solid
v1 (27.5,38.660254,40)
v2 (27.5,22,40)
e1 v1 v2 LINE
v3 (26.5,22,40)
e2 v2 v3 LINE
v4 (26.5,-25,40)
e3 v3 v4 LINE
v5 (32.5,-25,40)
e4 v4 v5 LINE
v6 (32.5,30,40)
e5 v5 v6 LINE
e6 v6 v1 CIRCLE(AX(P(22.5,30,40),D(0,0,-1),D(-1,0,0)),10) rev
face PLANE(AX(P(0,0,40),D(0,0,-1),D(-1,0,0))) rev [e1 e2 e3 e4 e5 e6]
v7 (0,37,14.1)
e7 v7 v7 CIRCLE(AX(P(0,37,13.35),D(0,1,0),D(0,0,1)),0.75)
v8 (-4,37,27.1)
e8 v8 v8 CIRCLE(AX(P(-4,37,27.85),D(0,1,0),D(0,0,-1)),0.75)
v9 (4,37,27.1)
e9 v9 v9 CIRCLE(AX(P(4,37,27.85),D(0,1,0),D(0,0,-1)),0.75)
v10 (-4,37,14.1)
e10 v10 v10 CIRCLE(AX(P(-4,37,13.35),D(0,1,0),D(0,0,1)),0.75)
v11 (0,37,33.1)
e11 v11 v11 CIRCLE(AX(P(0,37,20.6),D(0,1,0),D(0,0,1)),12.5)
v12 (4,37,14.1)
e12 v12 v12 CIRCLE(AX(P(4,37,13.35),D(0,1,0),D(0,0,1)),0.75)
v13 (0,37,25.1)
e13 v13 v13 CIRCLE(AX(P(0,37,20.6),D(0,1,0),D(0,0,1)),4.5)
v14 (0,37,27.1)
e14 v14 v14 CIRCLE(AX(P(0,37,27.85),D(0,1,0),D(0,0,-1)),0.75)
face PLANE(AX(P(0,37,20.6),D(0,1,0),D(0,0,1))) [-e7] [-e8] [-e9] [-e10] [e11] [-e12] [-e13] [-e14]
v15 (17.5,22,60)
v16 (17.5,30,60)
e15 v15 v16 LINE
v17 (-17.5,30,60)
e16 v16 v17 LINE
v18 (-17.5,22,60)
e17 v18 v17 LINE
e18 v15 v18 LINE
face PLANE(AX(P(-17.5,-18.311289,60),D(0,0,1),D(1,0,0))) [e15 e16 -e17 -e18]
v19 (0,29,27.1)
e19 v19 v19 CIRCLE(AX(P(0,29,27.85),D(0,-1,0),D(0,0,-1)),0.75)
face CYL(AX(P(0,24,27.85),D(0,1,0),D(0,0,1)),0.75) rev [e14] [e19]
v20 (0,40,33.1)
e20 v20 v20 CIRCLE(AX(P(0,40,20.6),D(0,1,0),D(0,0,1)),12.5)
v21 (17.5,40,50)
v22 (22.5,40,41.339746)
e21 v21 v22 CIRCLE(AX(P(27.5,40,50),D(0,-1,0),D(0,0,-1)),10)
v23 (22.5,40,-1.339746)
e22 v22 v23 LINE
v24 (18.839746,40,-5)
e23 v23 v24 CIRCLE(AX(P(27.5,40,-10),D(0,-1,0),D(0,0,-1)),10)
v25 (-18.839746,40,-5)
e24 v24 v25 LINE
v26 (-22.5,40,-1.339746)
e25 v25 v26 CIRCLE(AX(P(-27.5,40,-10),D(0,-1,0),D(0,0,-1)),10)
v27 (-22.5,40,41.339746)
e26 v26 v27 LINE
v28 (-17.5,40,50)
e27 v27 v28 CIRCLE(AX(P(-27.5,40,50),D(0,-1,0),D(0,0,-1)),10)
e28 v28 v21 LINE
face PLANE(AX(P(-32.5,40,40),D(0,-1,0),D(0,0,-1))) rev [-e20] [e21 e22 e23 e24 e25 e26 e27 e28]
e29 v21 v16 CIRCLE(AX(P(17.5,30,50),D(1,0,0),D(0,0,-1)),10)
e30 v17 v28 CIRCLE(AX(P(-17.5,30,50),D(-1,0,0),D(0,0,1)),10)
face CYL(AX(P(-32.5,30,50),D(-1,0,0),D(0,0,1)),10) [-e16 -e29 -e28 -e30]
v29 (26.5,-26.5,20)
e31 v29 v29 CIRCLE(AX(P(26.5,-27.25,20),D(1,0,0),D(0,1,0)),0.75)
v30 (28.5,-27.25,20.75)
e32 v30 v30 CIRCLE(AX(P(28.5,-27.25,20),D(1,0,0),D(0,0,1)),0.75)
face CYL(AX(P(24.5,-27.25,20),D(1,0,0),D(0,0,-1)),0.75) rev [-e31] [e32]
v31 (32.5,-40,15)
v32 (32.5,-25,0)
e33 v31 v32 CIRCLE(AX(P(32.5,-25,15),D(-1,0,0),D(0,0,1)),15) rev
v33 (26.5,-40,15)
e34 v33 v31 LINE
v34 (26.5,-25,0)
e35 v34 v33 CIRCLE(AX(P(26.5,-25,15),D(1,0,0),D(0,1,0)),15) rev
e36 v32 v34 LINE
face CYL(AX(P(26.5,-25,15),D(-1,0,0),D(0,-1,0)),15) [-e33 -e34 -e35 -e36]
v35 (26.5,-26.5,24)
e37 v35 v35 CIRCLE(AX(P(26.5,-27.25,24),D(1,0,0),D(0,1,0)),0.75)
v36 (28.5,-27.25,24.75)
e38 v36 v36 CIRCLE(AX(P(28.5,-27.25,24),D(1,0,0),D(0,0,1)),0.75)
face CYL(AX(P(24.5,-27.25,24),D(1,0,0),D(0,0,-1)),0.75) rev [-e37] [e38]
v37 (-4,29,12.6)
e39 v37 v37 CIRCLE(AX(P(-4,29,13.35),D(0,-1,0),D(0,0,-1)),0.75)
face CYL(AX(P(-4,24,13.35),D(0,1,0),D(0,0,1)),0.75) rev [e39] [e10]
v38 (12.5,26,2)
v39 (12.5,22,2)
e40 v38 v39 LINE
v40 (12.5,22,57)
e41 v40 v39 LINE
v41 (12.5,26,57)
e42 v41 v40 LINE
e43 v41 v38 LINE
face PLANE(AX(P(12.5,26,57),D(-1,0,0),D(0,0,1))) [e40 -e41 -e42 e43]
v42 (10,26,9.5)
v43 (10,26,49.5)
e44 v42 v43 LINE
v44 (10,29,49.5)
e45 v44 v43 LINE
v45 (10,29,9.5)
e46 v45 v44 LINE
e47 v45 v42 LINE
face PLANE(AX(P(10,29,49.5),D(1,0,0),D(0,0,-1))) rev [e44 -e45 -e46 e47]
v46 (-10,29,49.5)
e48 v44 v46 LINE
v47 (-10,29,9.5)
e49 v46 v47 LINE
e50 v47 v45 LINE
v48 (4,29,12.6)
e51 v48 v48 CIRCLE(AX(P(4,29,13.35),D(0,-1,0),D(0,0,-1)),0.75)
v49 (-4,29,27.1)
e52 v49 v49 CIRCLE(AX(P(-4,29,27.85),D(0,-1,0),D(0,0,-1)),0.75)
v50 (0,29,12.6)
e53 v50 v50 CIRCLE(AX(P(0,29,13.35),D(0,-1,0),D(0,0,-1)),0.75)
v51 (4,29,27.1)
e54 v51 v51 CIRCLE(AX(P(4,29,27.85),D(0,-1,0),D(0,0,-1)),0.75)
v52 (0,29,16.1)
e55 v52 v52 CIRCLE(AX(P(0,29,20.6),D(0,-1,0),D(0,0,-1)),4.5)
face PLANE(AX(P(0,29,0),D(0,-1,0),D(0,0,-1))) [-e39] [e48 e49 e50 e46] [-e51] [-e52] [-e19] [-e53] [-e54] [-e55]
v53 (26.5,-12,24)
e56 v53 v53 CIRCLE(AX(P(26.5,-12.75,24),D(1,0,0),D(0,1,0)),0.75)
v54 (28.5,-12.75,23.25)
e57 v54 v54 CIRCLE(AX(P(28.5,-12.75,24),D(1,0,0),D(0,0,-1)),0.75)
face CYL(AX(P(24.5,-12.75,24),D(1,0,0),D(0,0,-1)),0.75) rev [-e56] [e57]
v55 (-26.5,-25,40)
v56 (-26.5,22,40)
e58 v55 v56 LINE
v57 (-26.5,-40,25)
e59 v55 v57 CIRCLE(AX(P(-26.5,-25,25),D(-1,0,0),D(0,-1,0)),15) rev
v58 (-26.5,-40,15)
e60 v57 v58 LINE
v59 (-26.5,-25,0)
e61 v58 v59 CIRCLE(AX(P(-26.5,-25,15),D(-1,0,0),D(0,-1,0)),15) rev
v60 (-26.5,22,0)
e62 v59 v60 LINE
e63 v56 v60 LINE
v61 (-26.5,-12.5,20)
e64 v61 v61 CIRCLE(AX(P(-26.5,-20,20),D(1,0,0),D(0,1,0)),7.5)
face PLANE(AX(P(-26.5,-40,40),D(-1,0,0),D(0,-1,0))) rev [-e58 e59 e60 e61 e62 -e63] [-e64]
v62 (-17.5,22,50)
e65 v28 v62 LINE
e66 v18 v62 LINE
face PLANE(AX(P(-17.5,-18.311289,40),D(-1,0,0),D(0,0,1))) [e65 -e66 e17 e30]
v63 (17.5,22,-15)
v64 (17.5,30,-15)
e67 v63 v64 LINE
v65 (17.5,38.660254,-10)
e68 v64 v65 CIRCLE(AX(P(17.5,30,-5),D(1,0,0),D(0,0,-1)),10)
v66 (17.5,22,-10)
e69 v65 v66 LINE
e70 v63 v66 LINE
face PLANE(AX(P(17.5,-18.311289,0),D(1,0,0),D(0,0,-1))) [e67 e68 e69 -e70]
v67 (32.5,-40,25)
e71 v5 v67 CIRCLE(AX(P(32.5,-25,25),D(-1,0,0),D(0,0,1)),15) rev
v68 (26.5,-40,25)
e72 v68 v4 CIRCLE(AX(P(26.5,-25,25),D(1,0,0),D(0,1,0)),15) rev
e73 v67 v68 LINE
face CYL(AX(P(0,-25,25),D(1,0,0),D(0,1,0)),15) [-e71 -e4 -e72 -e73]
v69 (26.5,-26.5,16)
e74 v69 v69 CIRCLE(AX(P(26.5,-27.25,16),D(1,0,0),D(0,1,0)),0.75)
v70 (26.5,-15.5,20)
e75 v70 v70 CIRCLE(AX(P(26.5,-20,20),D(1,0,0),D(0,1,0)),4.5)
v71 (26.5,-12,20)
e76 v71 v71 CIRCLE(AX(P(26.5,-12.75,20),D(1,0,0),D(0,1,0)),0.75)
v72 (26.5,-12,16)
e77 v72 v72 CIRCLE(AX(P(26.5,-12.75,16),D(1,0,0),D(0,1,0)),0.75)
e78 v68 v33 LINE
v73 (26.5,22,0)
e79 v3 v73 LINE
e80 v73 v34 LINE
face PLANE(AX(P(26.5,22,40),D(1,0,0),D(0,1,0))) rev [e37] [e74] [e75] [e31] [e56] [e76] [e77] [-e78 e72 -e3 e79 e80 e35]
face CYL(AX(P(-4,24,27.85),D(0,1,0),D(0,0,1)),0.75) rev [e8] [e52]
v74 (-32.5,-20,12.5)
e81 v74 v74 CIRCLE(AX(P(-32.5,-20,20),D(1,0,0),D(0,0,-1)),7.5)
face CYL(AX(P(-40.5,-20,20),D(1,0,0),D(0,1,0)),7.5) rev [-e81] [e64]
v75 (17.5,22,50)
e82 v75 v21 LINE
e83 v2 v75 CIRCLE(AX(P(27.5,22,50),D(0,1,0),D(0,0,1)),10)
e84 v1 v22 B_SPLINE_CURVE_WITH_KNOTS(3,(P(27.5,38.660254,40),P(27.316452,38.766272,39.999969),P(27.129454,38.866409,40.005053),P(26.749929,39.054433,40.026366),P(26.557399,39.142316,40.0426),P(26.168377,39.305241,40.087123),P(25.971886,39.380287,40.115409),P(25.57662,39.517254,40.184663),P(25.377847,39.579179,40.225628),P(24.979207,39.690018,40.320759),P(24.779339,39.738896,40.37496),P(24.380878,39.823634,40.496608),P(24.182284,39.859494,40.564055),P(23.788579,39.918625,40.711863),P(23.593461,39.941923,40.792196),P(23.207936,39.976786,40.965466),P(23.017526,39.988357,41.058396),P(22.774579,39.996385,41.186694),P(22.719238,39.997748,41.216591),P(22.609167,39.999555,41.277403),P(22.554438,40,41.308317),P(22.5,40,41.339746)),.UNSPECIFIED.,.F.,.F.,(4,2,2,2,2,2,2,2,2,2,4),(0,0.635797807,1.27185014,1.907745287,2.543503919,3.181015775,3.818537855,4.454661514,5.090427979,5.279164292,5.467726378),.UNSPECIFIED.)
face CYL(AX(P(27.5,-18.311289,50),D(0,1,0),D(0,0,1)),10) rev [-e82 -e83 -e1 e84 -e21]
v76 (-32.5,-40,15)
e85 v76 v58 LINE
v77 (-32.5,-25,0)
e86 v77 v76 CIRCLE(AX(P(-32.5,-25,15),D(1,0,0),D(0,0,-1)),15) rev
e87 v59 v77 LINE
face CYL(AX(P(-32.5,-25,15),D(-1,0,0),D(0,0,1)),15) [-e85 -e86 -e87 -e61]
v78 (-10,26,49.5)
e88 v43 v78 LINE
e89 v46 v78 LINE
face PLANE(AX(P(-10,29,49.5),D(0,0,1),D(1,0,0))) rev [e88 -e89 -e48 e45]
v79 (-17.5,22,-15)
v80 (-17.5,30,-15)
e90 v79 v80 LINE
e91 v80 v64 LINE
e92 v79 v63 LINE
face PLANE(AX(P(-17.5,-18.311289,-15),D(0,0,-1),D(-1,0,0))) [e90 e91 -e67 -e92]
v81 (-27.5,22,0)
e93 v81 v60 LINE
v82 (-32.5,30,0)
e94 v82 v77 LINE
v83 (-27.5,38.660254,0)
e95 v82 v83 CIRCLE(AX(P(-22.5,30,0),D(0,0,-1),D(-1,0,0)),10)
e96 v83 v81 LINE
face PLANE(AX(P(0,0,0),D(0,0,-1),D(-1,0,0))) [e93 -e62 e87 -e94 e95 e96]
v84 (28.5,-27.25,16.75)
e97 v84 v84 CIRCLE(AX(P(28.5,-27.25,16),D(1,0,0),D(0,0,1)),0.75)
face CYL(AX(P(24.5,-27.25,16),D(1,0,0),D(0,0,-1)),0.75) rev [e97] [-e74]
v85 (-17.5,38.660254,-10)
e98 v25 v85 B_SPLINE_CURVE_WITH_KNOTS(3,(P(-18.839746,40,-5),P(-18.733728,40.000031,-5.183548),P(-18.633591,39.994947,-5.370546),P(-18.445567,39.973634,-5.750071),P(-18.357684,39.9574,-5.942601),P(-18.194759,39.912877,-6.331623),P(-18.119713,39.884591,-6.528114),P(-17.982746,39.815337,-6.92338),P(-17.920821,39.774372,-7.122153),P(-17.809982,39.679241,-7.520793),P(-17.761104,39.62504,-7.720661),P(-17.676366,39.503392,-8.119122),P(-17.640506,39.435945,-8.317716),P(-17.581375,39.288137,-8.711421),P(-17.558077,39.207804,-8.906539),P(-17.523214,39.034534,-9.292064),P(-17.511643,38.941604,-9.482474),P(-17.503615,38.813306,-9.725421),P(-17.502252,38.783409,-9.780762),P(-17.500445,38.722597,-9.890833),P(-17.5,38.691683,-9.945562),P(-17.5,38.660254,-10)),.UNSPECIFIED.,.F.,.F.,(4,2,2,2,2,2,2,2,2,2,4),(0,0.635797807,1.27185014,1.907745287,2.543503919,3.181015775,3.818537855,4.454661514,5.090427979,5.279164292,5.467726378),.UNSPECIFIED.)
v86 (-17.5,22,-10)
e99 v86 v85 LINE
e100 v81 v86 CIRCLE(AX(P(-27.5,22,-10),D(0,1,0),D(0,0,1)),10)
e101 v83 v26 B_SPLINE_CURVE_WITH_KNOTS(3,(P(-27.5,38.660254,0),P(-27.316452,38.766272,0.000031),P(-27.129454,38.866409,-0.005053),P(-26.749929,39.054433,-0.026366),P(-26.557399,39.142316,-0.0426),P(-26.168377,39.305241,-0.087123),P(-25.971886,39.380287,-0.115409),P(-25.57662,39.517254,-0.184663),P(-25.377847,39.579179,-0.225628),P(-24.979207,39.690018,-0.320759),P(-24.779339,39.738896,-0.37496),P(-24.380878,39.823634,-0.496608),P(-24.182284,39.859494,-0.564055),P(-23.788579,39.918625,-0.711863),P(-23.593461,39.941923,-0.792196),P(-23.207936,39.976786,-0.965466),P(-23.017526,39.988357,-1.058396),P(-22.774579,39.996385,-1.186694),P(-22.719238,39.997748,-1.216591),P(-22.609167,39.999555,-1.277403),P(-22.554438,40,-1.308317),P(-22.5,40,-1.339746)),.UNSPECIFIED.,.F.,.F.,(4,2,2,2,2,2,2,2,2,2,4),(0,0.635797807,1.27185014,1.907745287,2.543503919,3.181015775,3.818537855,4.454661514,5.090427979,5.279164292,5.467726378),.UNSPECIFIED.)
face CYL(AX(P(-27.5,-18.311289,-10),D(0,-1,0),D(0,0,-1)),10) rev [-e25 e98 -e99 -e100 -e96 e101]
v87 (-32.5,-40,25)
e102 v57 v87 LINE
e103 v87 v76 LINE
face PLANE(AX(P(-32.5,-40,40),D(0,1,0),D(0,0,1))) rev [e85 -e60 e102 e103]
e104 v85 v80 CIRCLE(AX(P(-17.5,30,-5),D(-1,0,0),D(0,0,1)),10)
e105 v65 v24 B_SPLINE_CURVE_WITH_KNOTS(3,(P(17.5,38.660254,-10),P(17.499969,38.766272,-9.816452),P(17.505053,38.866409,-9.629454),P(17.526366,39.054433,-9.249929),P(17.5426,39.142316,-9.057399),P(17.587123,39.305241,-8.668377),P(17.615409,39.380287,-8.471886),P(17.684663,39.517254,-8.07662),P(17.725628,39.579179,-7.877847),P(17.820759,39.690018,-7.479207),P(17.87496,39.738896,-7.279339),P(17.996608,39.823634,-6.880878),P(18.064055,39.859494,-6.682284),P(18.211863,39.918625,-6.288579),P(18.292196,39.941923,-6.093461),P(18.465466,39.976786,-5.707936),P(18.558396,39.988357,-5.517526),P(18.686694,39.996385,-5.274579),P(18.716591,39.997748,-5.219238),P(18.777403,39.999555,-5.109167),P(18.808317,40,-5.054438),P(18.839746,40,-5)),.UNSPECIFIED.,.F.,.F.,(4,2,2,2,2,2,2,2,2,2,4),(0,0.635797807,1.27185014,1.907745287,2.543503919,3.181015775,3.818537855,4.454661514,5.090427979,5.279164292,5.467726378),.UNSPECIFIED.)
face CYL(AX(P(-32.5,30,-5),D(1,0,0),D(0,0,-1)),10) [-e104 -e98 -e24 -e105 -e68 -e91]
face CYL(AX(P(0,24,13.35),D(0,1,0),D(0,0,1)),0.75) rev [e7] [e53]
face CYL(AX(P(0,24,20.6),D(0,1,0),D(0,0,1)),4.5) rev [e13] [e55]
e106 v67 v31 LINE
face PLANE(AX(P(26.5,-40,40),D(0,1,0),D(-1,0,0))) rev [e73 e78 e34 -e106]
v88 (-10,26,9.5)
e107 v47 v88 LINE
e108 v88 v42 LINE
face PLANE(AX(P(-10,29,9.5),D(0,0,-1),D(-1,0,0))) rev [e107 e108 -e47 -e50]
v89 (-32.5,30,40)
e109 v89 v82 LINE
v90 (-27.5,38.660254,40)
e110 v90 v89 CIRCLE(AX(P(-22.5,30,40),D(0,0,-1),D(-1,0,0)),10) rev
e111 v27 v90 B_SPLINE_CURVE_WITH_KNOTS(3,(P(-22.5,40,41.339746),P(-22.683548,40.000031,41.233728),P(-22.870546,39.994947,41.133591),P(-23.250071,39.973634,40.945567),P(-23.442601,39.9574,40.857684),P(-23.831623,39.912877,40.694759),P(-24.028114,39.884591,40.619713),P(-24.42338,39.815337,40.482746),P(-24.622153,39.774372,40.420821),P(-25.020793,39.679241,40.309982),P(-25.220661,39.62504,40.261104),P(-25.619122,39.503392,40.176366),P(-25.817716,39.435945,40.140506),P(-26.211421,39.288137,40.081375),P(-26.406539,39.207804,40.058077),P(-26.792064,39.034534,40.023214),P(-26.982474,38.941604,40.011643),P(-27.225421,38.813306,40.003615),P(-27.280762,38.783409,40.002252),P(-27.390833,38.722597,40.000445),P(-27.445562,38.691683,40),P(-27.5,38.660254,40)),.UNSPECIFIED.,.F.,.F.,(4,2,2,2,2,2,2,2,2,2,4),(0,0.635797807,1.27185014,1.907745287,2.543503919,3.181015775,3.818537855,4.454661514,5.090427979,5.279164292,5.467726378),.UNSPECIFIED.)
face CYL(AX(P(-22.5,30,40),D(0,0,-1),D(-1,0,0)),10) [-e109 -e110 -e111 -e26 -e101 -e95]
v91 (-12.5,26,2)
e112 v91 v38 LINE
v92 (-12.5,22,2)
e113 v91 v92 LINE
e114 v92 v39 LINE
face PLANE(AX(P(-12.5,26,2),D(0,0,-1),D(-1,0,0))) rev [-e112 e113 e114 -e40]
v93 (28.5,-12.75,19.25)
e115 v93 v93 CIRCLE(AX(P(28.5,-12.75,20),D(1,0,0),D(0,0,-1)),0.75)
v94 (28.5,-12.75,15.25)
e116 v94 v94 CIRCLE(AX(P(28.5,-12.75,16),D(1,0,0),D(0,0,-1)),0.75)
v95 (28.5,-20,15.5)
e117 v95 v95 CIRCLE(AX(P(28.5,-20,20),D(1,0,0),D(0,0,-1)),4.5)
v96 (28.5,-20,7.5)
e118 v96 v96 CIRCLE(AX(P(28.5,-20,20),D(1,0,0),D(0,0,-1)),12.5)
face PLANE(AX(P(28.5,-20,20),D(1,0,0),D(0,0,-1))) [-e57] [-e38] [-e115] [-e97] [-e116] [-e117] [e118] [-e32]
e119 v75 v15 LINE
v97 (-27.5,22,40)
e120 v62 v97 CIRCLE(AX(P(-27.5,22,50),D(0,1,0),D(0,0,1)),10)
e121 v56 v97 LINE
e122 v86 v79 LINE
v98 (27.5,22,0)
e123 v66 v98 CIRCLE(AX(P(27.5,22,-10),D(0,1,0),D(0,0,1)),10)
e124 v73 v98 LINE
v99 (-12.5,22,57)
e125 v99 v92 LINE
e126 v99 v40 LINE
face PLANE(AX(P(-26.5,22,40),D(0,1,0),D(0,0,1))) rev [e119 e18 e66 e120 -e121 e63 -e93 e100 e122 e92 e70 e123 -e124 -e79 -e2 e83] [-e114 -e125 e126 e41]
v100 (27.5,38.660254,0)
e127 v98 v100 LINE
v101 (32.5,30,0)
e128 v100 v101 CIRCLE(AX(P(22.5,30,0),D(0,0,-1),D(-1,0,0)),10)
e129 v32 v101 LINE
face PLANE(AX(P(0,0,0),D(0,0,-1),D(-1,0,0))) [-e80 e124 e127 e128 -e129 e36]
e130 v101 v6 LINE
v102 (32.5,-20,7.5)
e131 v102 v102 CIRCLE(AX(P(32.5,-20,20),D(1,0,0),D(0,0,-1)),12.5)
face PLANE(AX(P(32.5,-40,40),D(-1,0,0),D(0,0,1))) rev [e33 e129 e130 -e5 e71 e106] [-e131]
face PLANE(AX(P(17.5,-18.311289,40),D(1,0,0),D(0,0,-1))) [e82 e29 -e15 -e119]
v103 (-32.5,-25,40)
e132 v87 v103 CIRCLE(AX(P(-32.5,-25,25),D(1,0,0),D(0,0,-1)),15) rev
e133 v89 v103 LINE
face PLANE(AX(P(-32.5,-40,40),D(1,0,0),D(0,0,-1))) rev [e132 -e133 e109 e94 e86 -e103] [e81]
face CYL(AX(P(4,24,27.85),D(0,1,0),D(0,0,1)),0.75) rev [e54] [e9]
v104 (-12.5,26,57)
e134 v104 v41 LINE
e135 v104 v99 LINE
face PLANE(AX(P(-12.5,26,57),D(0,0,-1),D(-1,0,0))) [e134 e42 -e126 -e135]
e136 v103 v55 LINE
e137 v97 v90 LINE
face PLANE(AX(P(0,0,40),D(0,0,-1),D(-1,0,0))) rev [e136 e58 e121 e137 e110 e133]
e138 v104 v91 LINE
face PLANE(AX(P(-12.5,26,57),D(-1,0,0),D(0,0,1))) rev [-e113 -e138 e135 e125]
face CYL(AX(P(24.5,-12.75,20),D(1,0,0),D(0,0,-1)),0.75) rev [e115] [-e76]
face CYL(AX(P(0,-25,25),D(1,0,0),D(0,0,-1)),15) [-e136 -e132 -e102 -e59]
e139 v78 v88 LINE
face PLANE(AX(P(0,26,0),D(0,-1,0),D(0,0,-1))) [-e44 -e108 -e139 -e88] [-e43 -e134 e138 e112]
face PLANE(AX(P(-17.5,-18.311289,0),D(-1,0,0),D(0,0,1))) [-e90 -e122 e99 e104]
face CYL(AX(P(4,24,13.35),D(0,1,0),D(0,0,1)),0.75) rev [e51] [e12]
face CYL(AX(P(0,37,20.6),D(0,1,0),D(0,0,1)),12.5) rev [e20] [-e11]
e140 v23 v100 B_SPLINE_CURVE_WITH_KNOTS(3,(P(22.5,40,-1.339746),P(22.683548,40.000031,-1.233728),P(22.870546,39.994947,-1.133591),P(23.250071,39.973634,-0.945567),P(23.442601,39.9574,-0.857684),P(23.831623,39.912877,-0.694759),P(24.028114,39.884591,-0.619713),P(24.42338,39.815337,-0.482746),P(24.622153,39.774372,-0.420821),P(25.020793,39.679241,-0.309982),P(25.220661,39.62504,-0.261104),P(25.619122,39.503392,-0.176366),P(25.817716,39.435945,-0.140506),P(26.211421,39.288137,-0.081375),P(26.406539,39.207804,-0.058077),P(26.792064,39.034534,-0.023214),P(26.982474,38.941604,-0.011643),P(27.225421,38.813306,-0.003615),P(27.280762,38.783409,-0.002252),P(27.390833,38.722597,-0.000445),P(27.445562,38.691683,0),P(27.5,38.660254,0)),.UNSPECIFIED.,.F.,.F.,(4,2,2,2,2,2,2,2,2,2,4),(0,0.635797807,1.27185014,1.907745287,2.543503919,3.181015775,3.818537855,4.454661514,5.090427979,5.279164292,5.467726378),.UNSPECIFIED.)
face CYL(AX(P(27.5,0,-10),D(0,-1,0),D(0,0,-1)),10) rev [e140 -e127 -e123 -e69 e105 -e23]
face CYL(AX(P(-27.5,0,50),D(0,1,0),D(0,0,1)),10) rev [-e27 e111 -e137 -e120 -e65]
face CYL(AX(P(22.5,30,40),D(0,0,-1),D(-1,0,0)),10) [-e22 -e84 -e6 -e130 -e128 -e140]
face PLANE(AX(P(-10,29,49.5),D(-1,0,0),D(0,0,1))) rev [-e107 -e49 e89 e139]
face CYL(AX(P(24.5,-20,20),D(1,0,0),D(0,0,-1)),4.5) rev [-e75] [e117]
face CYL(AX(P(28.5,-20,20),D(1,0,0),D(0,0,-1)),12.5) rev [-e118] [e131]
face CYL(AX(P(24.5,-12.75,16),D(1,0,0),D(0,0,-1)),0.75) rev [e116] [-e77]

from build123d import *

# Parameters (mm, degrees)
BOSS_EXTRUDE1_DEPTH = 40
SKETCH2_R           = 12.5
CUT_EXTRUDE1_DEPTH  = 4
SKETCH3_R           = 0.75
SKETCH3_R_2         = 4.5
CUT_EXTRUDE2_DEPTH  = 4
SKETCH4_R           = 7.5
CUT_EXTRUDE3_DEPTH  = 14
SKETCH7_W           = 35
SKETCH7_H           = 15
SKETCH7_H_2         = 20
BOSS_EXTRUDE2_DEPTH = 18
SKETCH8_W           = 25
SKETCH8_H           = 55
CUT_EXTRUDE7_DEPTH  = 4
SKETCH9_W           = 20
SKETCH9_H           = 40
CUT_EXTRUDE8_DEPTH  = 3
SKETCH10_R          = 12.5
CUT_EXTRUDE9_DEPTH  = 3
SKETCH11_R          = 4.5
SKETCH11_R_2        = 0.75
CUT_EXTRUDE10_DEPTH = 13
FILLET1_R           = 15
FILLET2_R           = 10
FILLET3_R           = 10


with BuildPart() as part:
    # Sketch1 → Boss-Extrude1 (new body)
    with BuildSketch(Plane.XY):
        Polygon((-26.5, -40), (-26.5, 22), (26.5, 22), (26.5, -40), (32.5, -40), (32.5, 40), (-32.5, 40), (-32.5, -40), align=None)
    extrude(amount=BOSS_EXTRUDE1_DEPTH)

    # Sketch2 → Cut-Extrude1 (cut)
    with BuildSketch(Plane(origin=(32.5, 0, 0), x_dir=(0, 0, -1), z_dir=(1, 0, 0))):
        with Locations((-20, -20)):
            Circle(SKETCH2_R)
    extrude(amount=-CUT_EXTRUDE1_DEPTH, mode=Mode.SUBTRACT)

    # Sketch3 → Cut-Extrude2 (cut)
    with BuildSketch(Plane(origin=(28.5, 0, 0), x_dir=(0, 0, -1), z_dir=(1, 0, 0))):
        with Locations((-20, -12.75)):
            Circle(SKETCH3_R)
        with Locations((-16, -12.75)):
            Circle(SKETCH3_R)
        with Locations((-24, -12.75)):
            Circle(SKETCH3_R)
        with Locations((-20, -20)):
            Circle(SKETCH3_R_2)
        with Locations(Location((-16, -27.25, 0), (0, 0, 90))):
            Circle(SKETCH3_R)
        with Locations(Location((-20, -27.25, 0), (0, 0, 90))):
            Circle(SKETCH3_R)
        with Locations(Location((-24, -27.25, 0), (0, 0, 90))):
            Circle(SKETCH3_R)
    extrude(amount=-CUT_EXTRUDE2_DEPTH, mode=Mode.SUBTRACT)

    # Sketch4 → Cut-Extrude3 (cut)
    with BuildSketch(Plane(origin=(-26.5, 0, 0), x_dir=(0, 0, -1), z_dir=(1, 0, 0))):
        with Locations(Location((-20, -20, 0), (0, 0, 90))):
            Circle(SKETCH4_R)
    extrude(amount=-CUT_EXTRUDE3_DEPTH, mode=Mode.SUBTRACT)

    # Sketch7 → Boss-Extrude2 (add)
    with BuildSketch(Plane(origin=(0, 40, 0), x_dir=(1, 0, 0), z_dir=(0, 1, 0))):
        with Locations((0, 7.5)):
            Rectangle(SKETCH7_W, SKETCH7_H)
        with Locations((0, -50)):
            Rectangle(SKETCH7_W, SKETCH7_H_2)
    extrude(amount=-BOSS_EXTRUDE2_DEPTH)

    # Sketch8 → Cut-Extrude7 (cut)
    with BuildSketch(Plane.XZ.offset(-22)):
        with Locations((0, 29.5)):
            Rectangle(SKETCH8_W, SKETCH8_H)
    extrude(amount=-CUT_EXTRUDE7_DEPTH, mode=Mode.SUBTRACT)

    # Sketch9 → Cut-Extrude8 (cut)
    with BuildSketch(Plane.XZ.offset(-26)):
        with Locations((0, 29.5)):
            Rectangle(SKETCH9_W, SKETCH9_H)
    extrude(amount=-CUT_EXTRUDE8_DEPTH, mode=Mode.SUBTRACT)

    # Sketch10 → Cut-Extrude9 (cut)
    with BuildSketch(Plane(origin=(0, 40, 0), x_dir=(1, 0, 0), z_dir=(0, 1, 0))):
        with Locations(Location((0, -20.6, 0), (0, 0, 270))):
            Circle(SKETCH10_R)
    extrude(amount=-CUT_EXTRUDE9_DEPTH, mode=Mode.SUBTRACT)

    # Sketch11 → Cut-Extrude10 (cut)
    with BuildSketch(Plane(origin=(0, 37, 0), x_dir=(1, 0, 0), z_dir=(0, 1, 0))):
        with Locations(Location((0, -20.6, 0), (0, 0, 270))):
            Circle(SKETCH11_R)
        with Locations(Location((0, -13.35, 0), (0, 0, 270))):
            Circle(SKETCH11_R_2)
        with Locations(Location((4, -13.35, 0), (0, 0, 270))):
            Circle(SKETCH11_R_2)
        with Locations(Location((-4, -13.35, 0), (0, 0, 270))):
            Circle(SKETCH11_R_2)
        with Locations(Location((4, -27.85, 0), (0, 0, 90))):
            Circle(SKETCH11_R_2)
        with Locations(Location((0, -27.85, 0), (0, 0, 90))):
            Circle(SKETCH11_R_2)
        with Locations(Location((-4, -27.85, 0), (0, 0, 90))):
            Circle(SKETCH11_R_2)
    extrude(amount=-CUT_EXTRUDE10_DEPTH, mode=Mode.SUBTRACT)

    # Fillet1
    fillet1_edges = [part.edges().sort_by_distance(p)[0] for p in [
        (-29.5, -40, 0),
        (-29.5, -40, 40),
        (29.5, -40, 40),
        (29.5, -40, 0),
    ]]
    fillet(fillet1_edges, radius=FILLET1_R)

    # Fillet2
    # the kernel refuses this fillet: 10 mm, written as the material it adds along each edge
    with BuildSketch(Plane(origin=(-17.5, 40, 0), x_dir=(-1, 0, 0), z_dir=(0, -1, 0)), Plane(origin=(17.5, 40, 0), x_dir=(0, 0, -1), z_dir=(0, -1, 0))) as fillet2_piece_1:
        with BuildLine():
            CenterArc((FILLET2_R, FILLET2_R), FILLET2_R, 180, 90)
            Line((0, FILLET2_R), (0, 0))
            Line((0, 0), (FILLET2_R, 0))
        make_face()
    extrude(amount=18)
    with BuildSketch(Plane(origin=(-17.5, 40, 40), x_dir=(-1, 0, 0), z_dir=(0, -1, 0)), Plane(origin=(17.5, 40, 40), x_dir=(0, 0, 1), z_dir=(0, -1, 0))) as fillet2_piece_2:
        with BuildLine():
            CenterArc((FILLET2_R, -FILLET2_R), FILLET2_R, 90, 90)
            Line((0, -FILLET2_R), (0, 0))
            Line((0, 0), (FILLET2_R, 0))
        make_face()
    extrude(amount=18)

    # Fillet3
    fillet3_edges = [part.edges().sort_by_distance(p)[0] for p in [
        (0, 40, -15),
        (0, 40, 60),
        (32.5, 40, 20),
        (-32.5, 40, 20),
    ]]
    fillet(fillet3_edges, radius=FILLET3_R)


solid = part.part
